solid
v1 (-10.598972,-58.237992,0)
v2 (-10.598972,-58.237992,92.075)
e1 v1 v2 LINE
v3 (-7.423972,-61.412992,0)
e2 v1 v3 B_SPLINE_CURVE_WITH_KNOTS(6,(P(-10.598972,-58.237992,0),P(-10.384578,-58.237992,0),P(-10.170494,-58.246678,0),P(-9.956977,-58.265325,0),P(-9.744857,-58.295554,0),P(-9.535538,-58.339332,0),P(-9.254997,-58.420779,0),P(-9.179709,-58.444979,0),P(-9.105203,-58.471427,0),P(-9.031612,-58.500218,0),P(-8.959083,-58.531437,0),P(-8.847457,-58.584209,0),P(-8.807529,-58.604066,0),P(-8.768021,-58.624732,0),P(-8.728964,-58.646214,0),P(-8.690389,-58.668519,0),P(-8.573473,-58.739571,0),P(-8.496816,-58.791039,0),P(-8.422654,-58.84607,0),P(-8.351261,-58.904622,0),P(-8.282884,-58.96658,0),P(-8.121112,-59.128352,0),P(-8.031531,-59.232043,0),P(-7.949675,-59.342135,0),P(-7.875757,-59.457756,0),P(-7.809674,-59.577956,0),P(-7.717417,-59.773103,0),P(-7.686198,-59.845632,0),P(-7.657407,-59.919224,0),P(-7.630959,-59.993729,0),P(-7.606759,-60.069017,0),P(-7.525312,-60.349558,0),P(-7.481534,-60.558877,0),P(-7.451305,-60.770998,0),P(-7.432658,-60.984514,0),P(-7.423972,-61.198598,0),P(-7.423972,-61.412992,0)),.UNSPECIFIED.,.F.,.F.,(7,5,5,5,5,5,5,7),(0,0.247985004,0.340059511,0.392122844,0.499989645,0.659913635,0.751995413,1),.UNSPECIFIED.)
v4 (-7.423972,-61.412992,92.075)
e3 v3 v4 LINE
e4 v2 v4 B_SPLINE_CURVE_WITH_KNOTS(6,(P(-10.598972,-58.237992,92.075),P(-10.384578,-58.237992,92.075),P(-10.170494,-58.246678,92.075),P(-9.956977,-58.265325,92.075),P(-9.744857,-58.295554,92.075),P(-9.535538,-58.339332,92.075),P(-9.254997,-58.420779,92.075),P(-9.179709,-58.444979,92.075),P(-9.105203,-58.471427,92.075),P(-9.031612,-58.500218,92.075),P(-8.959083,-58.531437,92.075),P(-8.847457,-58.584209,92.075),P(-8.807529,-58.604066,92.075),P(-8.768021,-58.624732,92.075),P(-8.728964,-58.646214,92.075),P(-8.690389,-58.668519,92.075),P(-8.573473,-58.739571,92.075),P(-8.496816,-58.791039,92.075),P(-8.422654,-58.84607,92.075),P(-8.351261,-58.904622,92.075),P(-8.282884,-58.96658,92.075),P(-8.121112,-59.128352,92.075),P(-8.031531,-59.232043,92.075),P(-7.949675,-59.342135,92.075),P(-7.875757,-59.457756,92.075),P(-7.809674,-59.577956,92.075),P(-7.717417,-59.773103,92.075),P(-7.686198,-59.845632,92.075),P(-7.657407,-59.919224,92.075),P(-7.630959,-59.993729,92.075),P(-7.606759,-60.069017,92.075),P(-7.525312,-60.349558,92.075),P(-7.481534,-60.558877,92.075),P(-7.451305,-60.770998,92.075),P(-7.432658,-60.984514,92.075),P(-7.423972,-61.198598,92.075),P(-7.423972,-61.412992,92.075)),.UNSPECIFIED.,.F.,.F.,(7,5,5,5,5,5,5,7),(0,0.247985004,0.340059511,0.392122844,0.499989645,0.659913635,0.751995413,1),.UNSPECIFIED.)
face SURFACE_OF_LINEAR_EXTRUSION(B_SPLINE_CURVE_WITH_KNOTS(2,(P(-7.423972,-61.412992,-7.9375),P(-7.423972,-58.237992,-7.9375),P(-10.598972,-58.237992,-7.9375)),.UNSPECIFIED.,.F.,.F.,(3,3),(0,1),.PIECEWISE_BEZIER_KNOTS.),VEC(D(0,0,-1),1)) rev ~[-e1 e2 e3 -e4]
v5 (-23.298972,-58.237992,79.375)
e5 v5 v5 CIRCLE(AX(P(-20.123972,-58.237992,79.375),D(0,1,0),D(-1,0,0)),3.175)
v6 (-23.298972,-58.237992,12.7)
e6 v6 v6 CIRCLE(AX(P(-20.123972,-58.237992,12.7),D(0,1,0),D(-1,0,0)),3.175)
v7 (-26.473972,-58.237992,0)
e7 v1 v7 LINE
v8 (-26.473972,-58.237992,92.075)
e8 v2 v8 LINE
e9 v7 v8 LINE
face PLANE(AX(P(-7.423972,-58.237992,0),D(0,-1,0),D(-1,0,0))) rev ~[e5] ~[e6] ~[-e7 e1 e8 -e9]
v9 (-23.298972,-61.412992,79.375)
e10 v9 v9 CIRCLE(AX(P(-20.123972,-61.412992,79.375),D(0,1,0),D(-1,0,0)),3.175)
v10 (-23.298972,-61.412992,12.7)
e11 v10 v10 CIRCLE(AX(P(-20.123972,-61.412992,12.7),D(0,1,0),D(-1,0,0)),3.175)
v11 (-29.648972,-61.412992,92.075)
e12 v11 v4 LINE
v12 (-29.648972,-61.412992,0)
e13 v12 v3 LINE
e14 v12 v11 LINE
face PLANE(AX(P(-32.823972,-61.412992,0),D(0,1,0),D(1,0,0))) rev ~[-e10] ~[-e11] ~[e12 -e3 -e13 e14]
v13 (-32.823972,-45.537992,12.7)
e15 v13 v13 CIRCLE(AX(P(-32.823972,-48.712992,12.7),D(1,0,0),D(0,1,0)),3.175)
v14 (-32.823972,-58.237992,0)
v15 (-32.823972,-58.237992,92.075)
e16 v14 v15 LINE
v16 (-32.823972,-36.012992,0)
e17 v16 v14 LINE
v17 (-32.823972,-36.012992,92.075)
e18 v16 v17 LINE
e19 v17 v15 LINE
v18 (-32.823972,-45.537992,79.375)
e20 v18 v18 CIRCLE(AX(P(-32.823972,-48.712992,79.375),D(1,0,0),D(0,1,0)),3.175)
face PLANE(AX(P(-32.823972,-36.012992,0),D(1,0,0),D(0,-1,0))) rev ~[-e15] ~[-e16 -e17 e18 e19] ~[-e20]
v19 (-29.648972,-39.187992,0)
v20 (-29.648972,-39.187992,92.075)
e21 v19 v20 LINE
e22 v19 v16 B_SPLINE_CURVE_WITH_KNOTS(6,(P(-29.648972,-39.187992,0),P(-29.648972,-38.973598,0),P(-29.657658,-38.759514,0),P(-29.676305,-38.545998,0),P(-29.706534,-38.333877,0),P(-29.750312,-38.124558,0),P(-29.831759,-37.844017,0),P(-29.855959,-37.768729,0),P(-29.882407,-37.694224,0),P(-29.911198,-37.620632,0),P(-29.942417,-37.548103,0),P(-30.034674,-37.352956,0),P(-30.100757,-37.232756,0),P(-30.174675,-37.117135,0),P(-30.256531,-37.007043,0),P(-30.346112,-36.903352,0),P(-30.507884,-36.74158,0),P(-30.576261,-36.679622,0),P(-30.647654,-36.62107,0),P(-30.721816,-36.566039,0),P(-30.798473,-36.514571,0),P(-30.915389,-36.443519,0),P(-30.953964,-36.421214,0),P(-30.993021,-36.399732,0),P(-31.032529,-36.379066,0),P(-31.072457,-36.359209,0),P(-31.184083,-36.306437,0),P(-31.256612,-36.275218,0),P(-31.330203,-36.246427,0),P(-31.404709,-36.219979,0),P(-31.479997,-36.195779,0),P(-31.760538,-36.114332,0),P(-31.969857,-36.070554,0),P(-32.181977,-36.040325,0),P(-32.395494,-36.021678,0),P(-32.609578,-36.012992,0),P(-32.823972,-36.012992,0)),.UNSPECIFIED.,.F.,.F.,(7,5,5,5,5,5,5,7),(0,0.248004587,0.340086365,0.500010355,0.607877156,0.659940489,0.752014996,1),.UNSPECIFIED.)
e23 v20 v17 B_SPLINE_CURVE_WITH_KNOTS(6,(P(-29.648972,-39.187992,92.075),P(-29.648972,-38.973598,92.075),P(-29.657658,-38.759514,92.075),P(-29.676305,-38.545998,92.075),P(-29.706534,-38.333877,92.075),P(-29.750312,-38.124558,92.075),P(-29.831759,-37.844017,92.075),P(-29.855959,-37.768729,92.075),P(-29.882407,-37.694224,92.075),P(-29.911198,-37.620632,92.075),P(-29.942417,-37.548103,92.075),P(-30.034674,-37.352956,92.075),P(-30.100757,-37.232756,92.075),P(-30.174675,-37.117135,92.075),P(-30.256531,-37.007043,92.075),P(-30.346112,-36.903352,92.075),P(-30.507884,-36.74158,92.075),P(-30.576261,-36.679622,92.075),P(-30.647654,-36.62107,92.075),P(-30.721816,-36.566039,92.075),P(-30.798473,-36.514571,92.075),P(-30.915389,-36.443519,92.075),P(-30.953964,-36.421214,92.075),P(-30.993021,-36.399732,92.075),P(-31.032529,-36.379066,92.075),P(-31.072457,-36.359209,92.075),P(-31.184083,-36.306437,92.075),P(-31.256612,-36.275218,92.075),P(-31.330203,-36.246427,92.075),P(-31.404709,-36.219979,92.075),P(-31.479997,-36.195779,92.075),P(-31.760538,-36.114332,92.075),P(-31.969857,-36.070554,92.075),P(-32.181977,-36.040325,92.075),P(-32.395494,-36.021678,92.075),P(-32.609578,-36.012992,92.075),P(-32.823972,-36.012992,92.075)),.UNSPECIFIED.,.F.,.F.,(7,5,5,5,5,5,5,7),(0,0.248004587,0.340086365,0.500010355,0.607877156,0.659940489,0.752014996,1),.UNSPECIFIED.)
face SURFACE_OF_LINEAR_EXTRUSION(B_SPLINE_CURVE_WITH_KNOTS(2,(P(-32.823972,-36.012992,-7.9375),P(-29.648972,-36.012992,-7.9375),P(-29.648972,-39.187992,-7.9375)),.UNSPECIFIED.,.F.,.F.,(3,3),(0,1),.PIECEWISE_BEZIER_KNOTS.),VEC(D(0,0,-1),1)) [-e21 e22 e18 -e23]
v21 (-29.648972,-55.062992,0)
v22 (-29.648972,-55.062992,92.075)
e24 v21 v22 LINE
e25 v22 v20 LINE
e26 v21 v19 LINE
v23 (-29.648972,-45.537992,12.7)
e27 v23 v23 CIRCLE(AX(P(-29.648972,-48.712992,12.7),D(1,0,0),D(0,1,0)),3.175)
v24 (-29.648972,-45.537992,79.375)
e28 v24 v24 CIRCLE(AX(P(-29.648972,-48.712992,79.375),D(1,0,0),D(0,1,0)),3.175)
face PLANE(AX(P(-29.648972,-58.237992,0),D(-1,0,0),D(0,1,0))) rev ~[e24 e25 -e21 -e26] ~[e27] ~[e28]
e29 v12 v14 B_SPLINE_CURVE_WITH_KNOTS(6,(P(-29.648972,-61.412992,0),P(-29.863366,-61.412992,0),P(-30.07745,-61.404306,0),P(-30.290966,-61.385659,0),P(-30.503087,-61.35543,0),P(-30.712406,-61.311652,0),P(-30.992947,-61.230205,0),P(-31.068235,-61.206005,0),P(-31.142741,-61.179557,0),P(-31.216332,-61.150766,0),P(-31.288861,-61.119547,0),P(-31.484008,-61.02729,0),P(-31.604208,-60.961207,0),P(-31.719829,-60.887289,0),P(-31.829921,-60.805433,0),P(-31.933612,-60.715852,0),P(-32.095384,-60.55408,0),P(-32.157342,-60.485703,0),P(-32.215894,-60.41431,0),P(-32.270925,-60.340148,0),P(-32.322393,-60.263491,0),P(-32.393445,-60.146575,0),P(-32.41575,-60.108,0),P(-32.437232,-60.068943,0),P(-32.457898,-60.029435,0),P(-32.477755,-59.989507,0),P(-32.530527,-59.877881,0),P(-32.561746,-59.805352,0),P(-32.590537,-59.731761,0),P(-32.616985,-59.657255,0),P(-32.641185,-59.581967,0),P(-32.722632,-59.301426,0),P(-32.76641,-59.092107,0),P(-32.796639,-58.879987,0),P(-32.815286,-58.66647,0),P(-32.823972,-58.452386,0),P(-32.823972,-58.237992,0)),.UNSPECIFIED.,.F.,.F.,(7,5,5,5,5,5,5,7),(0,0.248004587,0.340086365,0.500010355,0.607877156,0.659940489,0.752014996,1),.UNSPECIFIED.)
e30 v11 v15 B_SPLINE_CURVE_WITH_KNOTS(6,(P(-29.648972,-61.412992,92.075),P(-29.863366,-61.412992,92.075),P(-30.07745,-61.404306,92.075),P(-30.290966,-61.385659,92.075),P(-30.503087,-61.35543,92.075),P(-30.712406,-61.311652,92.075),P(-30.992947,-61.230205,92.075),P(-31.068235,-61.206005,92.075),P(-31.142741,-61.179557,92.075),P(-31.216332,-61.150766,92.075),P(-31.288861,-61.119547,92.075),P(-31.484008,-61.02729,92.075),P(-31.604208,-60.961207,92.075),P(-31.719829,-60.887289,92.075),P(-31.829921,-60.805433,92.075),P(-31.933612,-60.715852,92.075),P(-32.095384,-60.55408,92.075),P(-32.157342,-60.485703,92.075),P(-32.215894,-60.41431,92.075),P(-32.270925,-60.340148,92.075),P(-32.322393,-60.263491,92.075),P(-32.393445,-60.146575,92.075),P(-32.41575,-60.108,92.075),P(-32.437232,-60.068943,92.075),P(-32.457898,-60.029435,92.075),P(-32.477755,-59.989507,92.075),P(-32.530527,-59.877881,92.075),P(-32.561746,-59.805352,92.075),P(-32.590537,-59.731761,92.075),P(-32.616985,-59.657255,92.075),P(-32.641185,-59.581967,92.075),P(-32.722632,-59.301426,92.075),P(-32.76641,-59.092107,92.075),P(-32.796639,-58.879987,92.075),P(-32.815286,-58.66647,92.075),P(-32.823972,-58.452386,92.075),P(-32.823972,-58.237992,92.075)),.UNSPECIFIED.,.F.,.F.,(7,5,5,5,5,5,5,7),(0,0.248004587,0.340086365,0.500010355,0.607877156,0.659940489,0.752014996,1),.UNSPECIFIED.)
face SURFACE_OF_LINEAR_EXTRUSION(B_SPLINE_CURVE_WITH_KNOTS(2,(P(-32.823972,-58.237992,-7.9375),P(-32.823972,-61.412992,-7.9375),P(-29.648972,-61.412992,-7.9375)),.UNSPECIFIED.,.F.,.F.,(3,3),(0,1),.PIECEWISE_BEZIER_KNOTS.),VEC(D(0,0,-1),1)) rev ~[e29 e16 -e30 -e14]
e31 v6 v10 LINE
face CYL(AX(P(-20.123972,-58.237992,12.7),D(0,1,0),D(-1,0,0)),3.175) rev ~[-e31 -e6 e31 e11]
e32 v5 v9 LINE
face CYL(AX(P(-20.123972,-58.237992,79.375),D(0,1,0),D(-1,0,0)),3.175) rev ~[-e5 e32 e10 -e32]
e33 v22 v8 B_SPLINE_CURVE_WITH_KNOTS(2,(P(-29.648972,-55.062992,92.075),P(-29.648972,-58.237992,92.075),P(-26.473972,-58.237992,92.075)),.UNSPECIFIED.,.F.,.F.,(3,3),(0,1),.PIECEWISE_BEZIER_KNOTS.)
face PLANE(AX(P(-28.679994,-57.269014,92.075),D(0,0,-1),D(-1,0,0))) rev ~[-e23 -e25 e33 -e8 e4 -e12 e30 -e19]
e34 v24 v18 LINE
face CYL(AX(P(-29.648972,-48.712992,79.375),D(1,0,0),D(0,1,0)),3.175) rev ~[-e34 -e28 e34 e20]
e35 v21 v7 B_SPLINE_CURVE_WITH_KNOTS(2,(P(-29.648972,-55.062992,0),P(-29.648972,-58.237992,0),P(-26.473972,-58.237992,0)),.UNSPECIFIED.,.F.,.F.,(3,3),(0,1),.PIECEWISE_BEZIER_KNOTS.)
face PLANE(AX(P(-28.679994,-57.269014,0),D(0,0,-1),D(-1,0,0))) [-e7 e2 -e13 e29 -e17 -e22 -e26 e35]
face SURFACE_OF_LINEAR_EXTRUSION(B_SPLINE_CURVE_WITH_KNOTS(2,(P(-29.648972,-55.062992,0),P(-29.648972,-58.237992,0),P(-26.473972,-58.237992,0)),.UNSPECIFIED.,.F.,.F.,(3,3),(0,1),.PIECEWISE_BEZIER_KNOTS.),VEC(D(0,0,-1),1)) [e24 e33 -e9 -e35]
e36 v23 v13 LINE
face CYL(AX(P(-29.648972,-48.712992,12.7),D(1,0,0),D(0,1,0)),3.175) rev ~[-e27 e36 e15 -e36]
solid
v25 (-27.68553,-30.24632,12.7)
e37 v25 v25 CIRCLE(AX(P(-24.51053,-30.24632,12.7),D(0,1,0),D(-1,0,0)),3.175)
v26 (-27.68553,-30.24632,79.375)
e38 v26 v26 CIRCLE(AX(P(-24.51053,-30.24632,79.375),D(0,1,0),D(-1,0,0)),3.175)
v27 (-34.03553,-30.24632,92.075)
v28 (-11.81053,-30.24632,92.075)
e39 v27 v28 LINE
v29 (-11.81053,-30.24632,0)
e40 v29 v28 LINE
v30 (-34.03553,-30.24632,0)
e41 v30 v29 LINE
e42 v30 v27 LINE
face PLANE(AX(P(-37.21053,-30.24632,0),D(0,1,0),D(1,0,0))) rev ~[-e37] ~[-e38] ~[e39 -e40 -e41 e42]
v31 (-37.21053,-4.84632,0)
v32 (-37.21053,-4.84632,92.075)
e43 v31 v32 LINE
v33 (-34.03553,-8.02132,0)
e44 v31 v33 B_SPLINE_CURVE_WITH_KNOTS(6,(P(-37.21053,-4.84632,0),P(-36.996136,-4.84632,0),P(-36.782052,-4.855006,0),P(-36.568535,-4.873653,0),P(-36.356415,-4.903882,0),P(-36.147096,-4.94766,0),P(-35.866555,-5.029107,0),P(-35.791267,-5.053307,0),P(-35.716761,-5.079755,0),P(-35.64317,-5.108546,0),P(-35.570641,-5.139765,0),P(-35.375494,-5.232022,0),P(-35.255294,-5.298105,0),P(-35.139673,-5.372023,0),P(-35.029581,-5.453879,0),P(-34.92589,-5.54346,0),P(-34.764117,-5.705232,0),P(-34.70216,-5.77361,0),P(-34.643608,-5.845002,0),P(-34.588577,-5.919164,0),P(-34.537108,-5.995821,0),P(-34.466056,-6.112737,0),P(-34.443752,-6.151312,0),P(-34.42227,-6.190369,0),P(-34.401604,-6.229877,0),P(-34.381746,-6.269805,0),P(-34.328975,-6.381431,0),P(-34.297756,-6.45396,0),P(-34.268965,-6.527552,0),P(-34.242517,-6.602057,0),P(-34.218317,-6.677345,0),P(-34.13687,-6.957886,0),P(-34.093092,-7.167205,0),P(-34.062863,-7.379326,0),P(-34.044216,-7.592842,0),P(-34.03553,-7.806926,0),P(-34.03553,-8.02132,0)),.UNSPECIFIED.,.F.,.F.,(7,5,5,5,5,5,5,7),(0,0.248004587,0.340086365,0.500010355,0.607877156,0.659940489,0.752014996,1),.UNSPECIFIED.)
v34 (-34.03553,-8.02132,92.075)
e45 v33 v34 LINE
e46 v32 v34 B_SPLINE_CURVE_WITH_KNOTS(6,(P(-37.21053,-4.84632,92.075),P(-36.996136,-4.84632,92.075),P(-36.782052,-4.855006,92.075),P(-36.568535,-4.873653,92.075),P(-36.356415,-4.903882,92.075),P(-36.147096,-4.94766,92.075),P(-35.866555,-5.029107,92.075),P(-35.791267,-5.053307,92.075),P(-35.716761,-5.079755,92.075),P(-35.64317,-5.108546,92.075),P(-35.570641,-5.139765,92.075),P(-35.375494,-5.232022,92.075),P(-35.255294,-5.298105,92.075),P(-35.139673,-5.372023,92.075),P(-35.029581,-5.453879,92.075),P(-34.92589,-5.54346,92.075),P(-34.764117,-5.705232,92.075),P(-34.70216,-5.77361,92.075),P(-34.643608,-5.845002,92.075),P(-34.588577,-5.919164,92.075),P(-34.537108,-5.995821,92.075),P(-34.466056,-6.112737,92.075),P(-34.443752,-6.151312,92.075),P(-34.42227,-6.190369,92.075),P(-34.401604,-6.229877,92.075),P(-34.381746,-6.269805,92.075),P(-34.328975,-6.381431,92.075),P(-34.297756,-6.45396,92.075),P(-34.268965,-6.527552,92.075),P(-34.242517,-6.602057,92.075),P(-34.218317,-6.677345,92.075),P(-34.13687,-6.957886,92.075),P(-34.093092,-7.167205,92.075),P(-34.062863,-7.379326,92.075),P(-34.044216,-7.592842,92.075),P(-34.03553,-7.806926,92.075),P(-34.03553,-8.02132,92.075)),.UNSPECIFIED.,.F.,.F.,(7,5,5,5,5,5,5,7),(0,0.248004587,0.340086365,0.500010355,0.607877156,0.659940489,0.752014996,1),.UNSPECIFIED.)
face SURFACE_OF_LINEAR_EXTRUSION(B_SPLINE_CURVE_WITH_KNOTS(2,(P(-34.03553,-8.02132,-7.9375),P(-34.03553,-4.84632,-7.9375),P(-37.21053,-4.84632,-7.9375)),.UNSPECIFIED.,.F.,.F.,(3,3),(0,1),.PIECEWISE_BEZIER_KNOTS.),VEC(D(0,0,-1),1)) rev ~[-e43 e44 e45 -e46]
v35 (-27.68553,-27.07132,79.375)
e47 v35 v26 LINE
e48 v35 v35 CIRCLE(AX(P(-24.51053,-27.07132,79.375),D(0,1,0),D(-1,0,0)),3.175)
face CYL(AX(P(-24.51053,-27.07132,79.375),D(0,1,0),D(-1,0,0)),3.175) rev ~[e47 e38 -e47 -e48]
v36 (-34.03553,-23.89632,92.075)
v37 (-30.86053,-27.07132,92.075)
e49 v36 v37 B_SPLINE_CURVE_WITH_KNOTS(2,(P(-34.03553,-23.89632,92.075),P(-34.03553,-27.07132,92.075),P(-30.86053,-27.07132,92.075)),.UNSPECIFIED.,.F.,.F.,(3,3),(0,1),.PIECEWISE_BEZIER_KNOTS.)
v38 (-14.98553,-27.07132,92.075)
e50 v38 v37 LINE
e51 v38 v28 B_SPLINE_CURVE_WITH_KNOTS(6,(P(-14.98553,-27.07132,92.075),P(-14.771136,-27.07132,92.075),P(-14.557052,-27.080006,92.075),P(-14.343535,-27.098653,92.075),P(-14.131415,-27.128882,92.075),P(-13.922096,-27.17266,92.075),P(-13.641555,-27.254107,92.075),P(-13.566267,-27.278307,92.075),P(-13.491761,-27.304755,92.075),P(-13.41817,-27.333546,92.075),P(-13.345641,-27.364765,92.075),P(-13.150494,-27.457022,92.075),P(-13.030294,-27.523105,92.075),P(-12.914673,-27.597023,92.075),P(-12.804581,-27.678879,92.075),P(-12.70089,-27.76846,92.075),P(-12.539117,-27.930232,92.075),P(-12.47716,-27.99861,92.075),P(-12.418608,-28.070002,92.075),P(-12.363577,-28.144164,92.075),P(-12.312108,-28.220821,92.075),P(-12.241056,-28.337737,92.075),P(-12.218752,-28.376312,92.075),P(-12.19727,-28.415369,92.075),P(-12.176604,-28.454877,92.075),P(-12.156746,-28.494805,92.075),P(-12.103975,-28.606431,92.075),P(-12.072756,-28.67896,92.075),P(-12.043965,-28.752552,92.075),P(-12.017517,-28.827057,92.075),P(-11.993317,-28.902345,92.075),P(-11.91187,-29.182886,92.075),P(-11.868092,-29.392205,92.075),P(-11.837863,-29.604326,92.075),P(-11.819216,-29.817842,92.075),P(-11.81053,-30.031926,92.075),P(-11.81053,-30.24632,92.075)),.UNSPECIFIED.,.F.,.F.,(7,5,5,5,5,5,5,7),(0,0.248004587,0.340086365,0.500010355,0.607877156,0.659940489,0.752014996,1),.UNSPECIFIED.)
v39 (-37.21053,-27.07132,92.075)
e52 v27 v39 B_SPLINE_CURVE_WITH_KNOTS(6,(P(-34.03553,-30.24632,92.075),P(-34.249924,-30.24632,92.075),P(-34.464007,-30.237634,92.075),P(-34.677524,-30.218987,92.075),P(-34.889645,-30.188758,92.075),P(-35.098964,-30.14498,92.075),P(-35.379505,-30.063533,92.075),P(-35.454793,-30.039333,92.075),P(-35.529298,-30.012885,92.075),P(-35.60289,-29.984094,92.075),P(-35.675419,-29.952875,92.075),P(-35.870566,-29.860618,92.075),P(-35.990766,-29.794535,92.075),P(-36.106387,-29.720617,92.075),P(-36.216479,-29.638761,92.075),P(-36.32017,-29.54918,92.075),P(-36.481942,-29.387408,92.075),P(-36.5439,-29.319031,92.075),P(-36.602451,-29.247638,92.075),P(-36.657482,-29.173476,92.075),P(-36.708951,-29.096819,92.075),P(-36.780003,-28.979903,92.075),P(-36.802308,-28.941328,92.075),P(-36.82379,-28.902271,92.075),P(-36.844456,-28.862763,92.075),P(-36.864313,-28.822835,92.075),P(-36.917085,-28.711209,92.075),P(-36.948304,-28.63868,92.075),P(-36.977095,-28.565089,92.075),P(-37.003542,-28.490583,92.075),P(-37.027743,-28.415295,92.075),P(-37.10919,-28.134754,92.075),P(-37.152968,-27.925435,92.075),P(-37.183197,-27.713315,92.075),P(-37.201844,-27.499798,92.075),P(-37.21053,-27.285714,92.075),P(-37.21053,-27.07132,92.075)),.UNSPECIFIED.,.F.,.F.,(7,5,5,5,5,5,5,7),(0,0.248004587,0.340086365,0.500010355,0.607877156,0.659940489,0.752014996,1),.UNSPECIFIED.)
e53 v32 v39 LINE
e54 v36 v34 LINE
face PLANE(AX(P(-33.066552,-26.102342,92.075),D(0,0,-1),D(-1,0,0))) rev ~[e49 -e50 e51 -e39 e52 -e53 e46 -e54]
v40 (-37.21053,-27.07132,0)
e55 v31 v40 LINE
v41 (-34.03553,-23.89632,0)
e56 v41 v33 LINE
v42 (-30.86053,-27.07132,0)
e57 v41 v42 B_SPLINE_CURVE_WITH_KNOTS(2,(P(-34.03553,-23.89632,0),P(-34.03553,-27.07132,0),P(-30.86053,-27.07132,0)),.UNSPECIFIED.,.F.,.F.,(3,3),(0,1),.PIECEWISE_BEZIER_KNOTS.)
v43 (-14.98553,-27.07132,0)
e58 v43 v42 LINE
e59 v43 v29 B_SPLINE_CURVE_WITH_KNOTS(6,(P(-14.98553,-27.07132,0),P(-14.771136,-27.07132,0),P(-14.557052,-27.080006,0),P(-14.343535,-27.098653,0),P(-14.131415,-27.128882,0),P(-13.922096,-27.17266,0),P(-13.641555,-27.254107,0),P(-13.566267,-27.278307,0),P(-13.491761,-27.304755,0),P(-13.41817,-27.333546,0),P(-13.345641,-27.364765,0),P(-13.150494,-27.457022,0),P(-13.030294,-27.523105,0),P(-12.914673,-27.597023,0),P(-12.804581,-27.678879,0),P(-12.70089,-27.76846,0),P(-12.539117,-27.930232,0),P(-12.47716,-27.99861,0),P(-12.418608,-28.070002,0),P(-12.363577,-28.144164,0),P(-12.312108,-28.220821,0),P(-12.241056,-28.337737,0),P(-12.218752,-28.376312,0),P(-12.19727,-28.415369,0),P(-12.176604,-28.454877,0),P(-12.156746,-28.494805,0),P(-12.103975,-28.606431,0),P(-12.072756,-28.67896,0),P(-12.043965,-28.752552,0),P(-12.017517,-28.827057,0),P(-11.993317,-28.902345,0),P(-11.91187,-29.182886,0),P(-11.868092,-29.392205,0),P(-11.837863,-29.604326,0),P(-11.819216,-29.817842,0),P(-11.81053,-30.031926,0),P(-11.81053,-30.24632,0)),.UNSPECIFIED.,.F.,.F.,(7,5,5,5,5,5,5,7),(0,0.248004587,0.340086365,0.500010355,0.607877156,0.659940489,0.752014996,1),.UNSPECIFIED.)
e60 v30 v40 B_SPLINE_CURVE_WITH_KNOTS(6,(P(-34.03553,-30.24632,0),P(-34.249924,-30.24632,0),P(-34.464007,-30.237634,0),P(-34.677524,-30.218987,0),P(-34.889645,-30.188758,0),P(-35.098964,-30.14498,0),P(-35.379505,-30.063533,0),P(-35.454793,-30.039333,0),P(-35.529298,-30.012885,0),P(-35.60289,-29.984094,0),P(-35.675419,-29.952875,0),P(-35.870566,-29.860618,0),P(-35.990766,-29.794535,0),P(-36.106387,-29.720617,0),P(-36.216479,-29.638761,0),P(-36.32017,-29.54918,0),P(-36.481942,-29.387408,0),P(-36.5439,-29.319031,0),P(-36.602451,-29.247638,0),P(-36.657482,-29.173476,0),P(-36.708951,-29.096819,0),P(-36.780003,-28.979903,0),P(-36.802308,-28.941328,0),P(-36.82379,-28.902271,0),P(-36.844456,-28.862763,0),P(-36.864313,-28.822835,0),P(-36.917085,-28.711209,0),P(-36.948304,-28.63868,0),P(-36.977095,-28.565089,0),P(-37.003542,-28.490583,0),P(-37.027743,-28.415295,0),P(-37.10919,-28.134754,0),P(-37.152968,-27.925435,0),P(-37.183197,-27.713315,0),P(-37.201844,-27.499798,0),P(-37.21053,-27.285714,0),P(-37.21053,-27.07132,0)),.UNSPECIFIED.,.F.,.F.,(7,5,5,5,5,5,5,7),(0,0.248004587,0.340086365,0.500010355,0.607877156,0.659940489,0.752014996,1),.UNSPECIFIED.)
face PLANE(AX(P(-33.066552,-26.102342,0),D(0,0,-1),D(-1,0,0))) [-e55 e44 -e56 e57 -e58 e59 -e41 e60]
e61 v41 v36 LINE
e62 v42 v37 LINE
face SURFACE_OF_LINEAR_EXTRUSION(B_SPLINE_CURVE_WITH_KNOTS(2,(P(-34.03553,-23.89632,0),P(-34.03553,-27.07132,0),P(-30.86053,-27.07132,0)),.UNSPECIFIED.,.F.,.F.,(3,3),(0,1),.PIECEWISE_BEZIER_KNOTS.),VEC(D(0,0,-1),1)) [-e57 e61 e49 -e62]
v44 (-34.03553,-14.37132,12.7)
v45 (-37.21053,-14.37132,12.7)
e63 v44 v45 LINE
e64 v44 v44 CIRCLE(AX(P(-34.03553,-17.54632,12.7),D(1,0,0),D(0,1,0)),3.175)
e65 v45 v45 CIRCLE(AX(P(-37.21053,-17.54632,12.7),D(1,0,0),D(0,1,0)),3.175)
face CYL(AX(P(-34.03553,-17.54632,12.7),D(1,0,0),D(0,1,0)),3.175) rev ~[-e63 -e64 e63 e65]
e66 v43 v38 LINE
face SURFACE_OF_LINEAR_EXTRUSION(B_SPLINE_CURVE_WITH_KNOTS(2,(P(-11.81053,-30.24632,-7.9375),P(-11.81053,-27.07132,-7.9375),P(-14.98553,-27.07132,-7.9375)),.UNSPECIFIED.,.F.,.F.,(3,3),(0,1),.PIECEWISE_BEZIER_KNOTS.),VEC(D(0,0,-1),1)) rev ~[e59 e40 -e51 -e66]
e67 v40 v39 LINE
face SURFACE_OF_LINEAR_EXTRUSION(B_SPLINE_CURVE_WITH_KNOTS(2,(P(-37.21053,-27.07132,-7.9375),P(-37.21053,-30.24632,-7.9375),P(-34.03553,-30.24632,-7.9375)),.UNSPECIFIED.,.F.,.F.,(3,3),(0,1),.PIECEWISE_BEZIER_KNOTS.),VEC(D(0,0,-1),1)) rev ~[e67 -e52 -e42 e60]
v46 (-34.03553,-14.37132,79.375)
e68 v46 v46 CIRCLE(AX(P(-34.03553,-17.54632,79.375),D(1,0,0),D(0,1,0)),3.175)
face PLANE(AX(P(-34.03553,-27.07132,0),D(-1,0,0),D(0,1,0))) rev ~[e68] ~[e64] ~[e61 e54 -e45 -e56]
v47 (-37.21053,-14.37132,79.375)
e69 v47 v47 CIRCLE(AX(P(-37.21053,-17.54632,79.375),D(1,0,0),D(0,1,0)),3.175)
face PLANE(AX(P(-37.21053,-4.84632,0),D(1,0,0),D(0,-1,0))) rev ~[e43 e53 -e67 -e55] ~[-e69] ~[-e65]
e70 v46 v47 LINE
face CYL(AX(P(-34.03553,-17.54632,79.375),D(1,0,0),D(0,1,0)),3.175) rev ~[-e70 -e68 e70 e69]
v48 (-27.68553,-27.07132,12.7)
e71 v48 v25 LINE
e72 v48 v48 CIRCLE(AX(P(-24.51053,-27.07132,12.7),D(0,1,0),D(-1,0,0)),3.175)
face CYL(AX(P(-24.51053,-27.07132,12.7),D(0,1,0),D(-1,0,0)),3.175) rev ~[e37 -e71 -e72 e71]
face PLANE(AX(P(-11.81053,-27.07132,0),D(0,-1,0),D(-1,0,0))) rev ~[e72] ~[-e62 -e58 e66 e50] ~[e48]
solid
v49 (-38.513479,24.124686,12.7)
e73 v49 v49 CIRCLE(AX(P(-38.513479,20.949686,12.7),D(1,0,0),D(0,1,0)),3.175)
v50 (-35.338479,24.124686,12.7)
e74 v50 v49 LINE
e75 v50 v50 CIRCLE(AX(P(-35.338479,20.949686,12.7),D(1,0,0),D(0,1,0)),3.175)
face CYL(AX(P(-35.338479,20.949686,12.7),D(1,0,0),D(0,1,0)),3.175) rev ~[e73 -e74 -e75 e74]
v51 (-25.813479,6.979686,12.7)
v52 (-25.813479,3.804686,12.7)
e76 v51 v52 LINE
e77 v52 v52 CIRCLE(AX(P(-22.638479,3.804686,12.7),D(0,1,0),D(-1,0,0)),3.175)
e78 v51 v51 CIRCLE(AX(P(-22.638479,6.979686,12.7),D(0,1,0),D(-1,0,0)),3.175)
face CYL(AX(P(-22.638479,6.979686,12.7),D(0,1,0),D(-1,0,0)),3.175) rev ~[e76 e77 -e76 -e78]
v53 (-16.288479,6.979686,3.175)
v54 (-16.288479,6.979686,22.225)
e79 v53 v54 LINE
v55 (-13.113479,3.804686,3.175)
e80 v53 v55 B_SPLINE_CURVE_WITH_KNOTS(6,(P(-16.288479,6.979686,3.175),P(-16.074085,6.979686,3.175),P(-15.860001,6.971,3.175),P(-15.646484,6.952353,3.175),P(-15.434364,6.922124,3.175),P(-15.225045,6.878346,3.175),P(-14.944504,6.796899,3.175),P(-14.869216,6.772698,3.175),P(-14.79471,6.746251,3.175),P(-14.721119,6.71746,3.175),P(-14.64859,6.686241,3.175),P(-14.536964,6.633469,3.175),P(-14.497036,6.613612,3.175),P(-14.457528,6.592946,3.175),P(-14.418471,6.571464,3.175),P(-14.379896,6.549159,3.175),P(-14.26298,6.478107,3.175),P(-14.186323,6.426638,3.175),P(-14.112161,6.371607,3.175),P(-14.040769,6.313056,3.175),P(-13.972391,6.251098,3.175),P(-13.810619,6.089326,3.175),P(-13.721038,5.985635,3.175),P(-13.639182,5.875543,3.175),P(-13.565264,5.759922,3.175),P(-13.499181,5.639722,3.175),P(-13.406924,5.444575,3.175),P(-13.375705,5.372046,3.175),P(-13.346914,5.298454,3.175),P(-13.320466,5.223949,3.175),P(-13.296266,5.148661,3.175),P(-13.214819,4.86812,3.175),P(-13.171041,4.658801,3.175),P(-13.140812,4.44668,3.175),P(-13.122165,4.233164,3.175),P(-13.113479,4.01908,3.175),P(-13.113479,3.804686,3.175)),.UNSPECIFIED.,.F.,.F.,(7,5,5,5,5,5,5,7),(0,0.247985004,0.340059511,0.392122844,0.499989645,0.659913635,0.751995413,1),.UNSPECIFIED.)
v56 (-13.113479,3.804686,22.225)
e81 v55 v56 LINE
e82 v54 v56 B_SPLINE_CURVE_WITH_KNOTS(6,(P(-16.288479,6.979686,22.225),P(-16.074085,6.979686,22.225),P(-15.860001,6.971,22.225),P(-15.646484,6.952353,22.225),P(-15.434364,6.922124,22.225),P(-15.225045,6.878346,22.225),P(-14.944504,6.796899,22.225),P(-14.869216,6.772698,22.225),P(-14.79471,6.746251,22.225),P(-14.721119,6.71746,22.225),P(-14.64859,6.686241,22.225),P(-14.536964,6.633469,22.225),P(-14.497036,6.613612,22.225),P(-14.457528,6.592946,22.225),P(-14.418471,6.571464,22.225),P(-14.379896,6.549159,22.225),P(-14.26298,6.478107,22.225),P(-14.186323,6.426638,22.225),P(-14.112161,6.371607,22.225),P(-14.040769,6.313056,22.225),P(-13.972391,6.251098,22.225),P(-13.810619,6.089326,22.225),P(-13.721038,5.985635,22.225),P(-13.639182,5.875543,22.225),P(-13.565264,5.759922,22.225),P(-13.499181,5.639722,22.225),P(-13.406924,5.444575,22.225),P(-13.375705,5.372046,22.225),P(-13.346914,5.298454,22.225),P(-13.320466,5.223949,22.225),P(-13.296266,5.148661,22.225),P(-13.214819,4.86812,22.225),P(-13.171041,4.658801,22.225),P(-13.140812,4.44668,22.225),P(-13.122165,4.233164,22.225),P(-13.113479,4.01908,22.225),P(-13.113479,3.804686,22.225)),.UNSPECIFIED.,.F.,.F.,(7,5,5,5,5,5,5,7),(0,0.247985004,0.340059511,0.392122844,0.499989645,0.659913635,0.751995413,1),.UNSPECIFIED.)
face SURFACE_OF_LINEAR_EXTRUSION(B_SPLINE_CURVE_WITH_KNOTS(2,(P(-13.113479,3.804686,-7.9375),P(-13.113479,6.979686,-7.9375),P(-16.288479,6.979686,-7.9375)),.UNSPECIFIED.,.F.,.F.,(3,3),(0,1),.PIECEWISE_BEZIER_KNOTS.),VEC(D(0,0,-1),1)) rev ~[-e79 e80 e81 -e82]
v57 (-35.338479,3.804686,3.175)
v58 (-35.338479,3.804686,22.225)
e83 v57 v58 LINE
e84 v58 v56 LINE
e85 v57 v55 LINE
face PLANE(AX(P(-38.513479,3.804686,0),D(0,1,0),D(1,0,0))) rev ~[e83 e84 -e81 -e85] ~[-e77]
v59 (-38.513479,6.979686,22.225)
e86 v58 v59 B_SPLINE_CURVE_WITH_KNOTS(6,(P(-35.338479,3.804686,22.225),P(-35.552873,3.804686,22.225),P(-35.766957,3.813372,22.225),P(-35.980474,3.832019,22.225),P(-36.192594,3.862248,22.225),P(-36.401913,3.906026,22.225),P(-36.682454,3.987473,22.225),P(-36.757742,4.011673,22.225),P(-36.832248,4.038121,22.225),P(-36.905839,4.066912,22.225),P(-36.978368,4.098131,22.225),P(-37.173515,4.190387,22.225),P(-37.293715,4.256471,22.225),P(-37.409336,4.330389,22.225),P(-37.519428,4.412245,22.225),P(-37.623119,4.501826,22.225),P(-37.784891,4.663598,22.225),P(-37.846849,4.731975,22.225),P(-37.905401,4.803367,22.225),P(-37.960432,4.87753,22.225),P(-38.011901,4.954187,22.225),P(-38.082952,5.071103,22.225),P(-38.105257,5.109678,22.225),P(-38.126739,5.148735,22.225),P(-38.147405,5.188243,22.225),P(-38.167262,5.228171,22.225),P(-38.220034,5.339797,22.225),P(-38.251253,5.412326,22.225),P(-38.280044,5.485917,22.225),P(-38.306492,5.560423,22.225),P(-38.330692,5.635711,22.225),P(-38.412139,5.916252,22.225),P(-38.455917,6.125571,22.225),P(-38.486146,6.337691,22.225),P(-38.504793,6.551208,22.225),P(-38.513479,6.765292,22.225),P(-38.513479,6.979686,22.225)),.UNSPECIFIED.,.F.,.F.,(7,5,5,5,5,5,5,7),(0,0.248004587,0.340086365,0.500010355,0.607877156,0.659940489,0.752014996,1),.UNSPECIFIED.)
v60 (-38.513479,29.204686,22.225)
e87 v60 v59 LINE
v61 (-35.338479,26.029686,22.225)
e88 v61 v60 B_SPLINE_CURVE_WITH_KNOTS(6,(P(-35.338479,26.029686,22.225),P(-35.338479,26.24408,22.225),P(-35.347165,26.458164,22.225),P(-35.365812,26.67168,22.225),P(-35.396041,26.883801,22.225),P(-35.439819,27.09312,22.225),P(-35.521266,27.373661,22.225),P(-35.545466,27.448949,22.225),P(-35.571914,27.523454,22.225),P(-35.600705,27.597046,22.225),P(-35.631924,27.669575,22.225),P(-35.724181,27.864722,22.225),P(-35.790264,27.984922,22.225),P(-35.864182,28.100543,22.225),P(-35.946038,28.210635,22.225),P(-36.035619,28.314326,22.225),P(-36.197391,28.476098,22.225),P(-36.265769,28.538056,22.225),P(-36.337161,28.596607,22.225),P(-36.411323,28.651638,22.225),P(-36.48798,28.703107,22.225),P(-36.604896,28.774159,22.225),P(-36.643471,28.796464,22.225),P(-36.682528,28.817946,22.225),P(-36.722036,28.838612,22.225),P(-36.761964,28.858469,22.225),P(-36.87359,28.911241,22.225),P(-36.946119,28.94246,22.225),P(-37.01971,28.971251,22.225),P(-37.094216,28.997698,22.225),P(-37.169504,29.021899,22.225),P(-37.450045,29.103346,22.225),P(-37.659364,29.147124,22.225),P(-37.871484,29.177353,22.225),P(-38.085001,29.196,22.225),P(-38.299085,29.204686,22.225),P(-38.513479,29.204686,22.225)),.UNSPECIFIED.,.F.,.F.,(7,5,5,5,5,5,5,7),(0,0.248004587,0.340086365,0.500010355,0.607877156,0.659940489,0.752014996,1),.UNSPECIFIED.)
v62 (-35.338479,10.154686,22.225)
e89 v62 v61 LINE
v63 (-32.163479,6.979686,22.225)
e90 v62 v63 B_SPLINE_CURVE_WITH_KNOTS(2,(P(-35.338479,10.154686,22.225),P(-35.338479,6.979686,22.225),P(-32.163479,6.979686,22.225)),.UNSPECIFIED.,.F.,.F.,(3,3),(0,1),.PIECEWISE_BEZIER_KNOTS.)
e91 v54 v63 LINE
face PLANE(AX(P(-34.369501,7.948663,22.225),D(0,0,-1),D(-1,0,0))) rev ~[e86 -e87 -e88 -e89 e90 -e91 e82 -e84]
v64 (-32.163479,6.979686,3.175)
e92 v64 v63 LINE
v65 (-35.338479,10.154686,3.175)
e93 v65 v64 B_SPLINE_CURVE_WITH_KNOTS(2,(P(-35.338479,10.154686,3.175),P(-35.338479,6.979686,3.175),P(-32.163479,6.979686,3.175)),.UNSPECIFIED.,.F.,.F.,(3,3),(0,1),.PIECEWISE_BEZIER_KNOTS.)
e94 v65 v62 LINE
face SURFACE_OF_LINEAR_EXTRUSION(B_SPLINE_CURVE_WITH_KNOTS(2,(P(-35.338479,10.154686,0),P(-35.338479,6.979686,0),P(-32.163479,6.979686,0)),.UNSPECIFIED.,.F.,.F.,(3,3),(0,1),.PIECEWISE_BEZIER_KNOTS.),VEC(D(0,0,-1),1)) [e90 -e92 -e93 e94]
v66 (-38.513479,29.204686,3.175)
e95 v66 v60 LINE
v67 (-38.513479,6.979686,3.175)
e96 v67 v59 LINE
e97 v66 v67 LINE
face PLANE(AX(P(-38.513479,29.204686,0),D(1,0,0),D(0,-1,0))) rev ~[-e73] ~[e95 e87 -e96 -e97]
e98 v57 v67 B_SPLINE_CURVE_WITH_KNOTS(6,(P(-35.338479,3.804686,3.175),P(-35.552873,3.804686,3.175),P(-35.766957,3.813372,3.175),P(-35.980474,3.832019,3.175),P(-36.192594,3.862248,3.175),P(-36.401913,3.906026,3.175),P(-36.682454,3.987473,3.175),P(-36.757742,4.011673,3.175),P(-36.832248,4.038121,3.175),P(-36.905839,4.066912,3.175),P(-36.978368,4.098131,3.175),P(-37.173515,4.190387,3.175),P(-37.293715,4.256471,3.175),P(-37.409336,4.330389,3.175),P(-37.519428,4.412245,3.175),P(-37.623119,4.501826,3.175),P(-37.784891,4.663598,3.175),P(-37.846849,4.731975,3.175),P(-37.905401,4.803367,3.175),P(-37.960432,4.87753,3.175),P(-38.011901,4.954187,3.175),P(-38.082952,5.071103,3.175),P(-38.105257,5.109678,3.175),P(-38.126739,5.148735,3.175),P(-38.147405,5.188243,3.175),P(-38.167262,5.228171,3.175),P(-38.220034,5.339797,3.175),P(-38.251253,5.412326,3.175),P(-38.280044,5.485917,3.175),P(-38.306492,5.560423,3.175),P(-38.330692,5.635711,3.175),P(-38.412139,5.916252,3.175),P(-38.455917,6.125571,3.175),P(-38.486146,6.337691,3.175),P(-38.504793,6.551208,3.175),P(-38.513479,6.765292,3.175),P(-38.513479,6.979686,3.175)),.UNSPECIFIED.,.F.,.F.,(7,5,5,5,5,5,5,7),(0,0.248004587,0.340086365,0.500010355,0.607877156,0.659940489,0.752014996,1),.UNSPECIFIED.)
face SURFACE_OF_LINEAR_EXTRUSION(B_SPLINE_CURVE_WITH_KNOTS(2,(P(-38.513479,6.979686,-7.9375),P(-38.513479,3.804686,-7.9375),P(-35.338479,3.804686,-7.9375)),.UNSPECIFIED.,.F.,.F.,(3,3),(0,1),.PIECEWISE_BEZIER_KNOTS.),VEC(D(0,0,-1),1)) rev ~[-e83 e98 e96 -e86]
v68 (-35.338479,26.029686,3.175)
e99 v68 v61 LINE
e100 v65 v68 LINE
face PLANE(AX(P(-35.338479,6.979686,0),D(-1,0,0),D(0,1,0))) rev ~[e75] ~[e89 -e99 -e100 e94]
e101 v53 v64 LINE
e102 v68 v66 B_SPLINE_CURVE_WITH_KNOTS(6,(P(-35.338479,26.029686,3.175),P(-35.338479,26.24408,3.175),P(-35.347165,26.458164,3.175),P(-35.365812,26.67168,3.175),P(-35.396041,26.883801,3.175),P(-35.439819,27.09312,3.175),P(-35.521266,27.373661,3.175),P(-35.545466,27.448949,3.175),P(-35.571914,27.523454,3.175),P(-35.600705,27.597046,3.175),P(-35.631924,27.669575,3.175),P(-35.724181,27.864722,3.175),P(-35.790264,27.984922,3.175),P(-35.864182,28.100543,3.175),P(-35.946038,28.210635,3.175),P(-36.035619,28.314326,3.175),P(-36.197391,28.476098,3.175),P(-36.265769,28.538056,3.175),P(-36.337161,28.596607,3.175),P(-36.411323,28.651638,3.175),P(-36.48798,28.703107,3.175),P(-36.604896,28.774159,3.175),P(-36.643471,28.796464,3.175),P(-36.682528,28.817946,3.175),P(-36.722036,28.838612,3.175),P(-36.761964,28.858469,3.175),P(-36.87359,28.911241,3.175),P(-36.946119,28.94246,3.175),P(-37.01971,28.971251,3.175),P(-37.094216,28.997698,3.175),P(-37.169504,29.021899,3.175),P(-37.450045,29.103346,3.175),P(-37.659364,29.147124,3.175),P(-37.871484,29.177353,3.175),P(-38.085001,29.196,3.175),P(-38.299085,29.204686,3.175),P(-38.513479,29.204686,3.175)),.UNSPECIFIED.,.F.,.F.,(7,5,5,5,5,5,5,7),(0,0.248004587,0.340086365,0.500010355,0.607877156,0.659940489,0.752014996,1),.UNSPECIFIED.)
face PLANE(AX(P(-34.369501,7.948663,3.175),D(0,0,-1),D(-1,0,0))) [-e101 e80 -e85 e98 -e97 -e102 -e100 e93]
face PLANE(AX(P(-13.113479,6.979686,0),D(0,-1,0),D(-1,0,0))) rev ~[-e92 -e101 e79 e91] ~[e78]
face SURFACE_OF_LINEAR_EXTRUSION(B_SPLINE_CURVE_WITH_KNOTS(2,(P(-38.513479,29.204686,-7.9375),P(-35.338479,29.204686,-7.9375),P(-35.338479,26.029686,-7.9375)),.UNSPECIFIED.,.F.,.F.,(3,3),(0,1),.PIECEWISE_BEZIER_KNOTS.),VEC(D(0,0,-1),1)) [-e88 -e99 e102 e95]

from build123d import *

# Parameters (mm, degrees)
F1_DEPTH       = 25.4
F3_DEPTH       = 92.075
F7_R           = 3.175
F9_DEPTH       = 3.175
F8_R           = 3.175
F10_DEPTH      = 3.175
F11_R          = 3.175
F13_DEPTH      = 3.175
F12_R          = 3.175
F14_DEPTH      = 3.175
F6_R           = 3.175
F15_DEPTH      = 3.175
F16_R          = 3.175
F17_DEPTH      = 3.175
F18_T1_DEPTH   = 92.075
F18_T3_DEPTH   = 107.95
F18_2_T1_DEPTH = 25.4
F18_2_T3_DEPTH = 41.275
F18_3_T1_DEPTH = 92.075
F18_3_T3_DEPTH = 107.95
F19_DEPTH      = 1.5875
F20_DEPTH      = 1.5875
F21_DEPTH      = 1.5875
F22_DEPTH      = 1.5875


# Not quite as in the source:
# - a fillet or chamfer that OpenCascade refuses, or shapes differently, is made with other operations: its cross-section is extruded or revolved along the edge and cut away or added


with BuildPart() as f1:
    # F0 (on Top) → F1 (new body)
    with BuildSketch(Plane.XY):
        Polygon((-35.3384790047, 29.2046858582), (-38.5134790047, 29.2046858582), (-38.5134790047, 3.8046858582), (-13.1134790047, 3.8046858582), (-13.1134790047, 6.9796858582), (-35.3384790047, 6.9796858582), align=None)
    extrude(amount=F1_DEPTH)

    # F6 (on face) → F15 (cut)
    with BuildSketch(Plane.YZ.offset(-35.3384790047)):
        with Locations((20.9496858582, 12.7)):
            Circle(F6_R)
    extrude(amount=-F15_DEPTH, mode=Mode.SUBTRACT)

    # F16 (on face) → F17 (cut)
    with BuildSketch(Plane(origin=(0, 6.9796858582, 0), x_dir=(-1, 0, 0), z_dir=(0, 1, 0))):
        with Locations((22.6384790047, 12.7)):
            Circle(F16_R)
    extrude(amount=-F17_DEPTH, mode=Mode.SUBTRACT)

    # F18#2: fillet of radius 3.175 on 4 edges, made by hand

    # F18_2_s2 → F18_2_t1 (join)
    with BuildSketch(Plane.XY):
        with BuildLine():
            add(Edge.make_bspline(
                [(-35.3384790047, 10.1546858582), (-35.3384790047, 6.9796858582), (-32.1634790047, 6.9796858582)],
                knots=[0, 0, 0, 1, 1, 1], degree=2, weights=[1, 1, 1]))
            Line((-32.1634790047, 6.9796858582), (-35.3384790047, 6.9796858582))
            Line((-35.3384790047, 6.9796858582), (-35.3384790047, 10.1546858582))
        make_face()
    extrude(amount=F18_2_T1_DEPTH)

    # F18_2_s4 → F18_2_t3 (cut)
    with BuildSketch(Plane.XY.offset(-7.9375)):
        with BuildLine():
            add(Edge.make_bspline(
                [(-38.5134790047, 6.9796858582), (-38.5134790047, 3.8046858582), (-35.3384790047, 3.8046858582)],
                knots=[0, 0, 0, 1, 1, 1], degree=2, weights=[1, 1, 1]))
            Line((-35.3384790047, 3.8046858582), (-38.5134790047, 3.8046858582))
            Line((-38.5134790047, 3.8046858582), (-38.5134790047, 6.9796858582))
        make_face()
        with BuildLine():
            add(Edge.make_bspline(
                [(-13.1134790047, 3.8046858582), (-13.1134790047, 6.9796858582), (-16.2884790047, 6.9796858582)],
                knots=[0, 0, 0, 1, 1, 1], degree=2, weights=[1, 1, 1]))
            Line((-16.2884790047, 6.9796858582), (-13.1134790047, 6.9796858582))
            Line((-13.1134790047, 6.9796858582), (-13.1134790047, 3.8046858582))
        make_face()
        with BuildLine():
            add(Edge.make_bspline(
                [(-38.5134790047, 29.2046858582), (-35.3384790047, 29.2046858582), (-35.3384790047, 26.0296858582)],
                knots=[0, 0, 0, 1, 1, 1], degree=2, weights=[1, 1, 1]))
            Line((-35.3384790047, 26.0296858582), (-35.3384790047, 29.2046858582))
            Line((-35.3384790047, 29.2046858582), (-38.5134790047, 29.2046858582))
        make_face()
    extrude(amount=F18_2_T3_DEPTH, mode=Mode.SUBTRACT)

    # F19 (cut): a face of the model
    f19_faces = [f1.faces().sort_by_distance(p)[0] for p in [
        (-36.3862356489, 28.1569424984, 0),
    ]]
    extrude(f19_faces, amount=-F19_DEPTH, mode=Mode.SUBTRACT)

    # F20 (cut): a face of the model
    f20_faces = [f1.faces().sort_by_distance(p)[0] for p in [
        (-36.3862356489, 28.1569424984, 25.4),
    ]]
    extrude(f20_faces, amount=-F20_DEPTH, mode=Mode.SUBTRACT)

    # F21 (cut): a face of the model
    f21_faces = [f1.faces().sort_by_distance(p)[0] for p in [
        (-36.3862356489, 28.1569424984, 1.5875),
    ]]
    extrude(f21_faces, amount=-F21_DEPTH, mode=Mode.SUBTRACT)

    # F22 (cut): a face of the model
    f22_faces = [f1.faces().sort_by_distance(p)[0] for p in [
        (-36.3862356489, 28.1569424984, 23.8125),
    ]]
    extrude(f22_faces, amount=-F22_DEPTH, mode=Mode.SUBTRACT)


with BuildPart() as f3:
    # F0 (on Top) → F3 (new body)
    with BuildSketch(Plane.XY):
        Polygon((4.3401528042, 29.2046858582), (4.3401528042, 3.8046858582), (29.7401528042, 3.8046858582), (29.7401528042, 6.9796858582), (7.5151528042, 6.9796858582), (7.5151528042, 29.2046858582), align=None)
    extrude(amount=F3_DEPTH)


with BuildPart() as f3b:
    # F2 (on Top) → F3, piece 2 (new body)
    with BuildSketch(Plane.XY):
        Polygon((-37.2105298044, -4.8463200888), (-37.2105298044, -30.2463200888), (-11.8105298044, -30.2463200888), (-11.8105298044, -27.0713200888), (-34.0355298044, -27.0713200888), (-34.0355298044, -4.8463200888), align=None)
    extrude(amount=F3_DEPTH)

    # F8 (on face) → F10 (cut)
    with BuildSketch(Plane(origin=(0, -27.0713200888, 0), x_dir=(-1, 0, 0), z_dir=(0, 1, 0))):
        with Locations((24.5105298044, 79.375)):
            Circle(F8_R)
        with Locations((24.5105298044, 12.7)):
            Circle(F8_R)
    extrude(amount=-F10_DEPTH, mode=Mode.SUBTRACT)

    # F12 (on face) → F14 (cut)
    with BuildSketch(Plane.YZ.offset(-34.0355298044)):
        with Locations((-17.5463200888, 79.375)):
            Circle(F12_R)
        with Locations((-17.5463200888, 12.7)):
            Circle(F12_R)
    extrude(amount=-F14_DEPTH, mode=Mode.SUBTRACT)

    # F18: fillet of radius 3.175 on 4 edges, made by hand

    # F18_s2 → F18_t1 (join)
    with BuildSketch(Plane.XY):
        with BuildLine():
            add(Edge.make_bspline(
                [(-34.0355298044, -23.8963200888), (-34.0355298044, -27.0713200888), (-30.8605298044, -27.0713200888)],
                knots=[0, 0, 0, 1, 1, 1], degree=2, weights=[1, 1, 1]))
            Line((-30.8605298044, -27.0713200888), (-34.0355298044, -27.0713200888))
            Line((-34.0355298044, -27.0713200888), (-34.0355298044, -23.8963200888))
        make_face()
    extrude(amount=F18_T1_DEPTH)

    # F18_s4 → F18_t3 (cut)
    with BuildSketch(Plane.XY.offset(-7.9375)):
        with BuildLine():
            add(Edge.make_bspline(
                [(-37.2105298044, -27.0713200888), (-37.2105298044, -30.2463200888), (-34.0355298044, -30.2463200888)],
                knots=[0, 0, 0, 1, 1, 1], degree=2, weights=[1, 1, 1]))
            Line((-34.0355298044, -30.2463200888), (-37.2105298044, -30.2463200888))
            Line((-37.2105298044, -30.2463200888), (-37.2105298044, -27.0713200888))
        make_face()
        with BuildLine():
            add(Edge.make_bspline(
                [(-11.8105298044, -30.2463200888), (-11.8105298044, -27.0713200888), (-14.9855298044, -27.0713200888)],
                knots=[0, 0, 0, 1, 1, 1], degree=2, weights=[1, 1, 1]))
            Line((-14.9855298044, -27.0713200888), (-11.8105298044, -27.0713200888))
            Line((-11.8105298044, -27.0713200888), (-11.8105298044, -30.2463200888))
        make_face()
        with BuildLine():
            add(Edge.make_bspline(
                [(-34.0355298044, -8.0213200888), (-34.0355298044, -4.8463200888), (-37.2105298044, -4.8463200888)],
                knots=[0, 0, 0, 1, 1, 1], degree=2, weights=[1, 1, 1]))
            Line((-37.2105298044, -4.8463200888), (-34.0355298044, -4.8463200888))
            Line((-34.0355298044, -4.8463200888), (-34.0355298044, -8.0213200888))
        make_face()
    extrude(amount=F18_T3_DEPTH, mode=Mode.SUBTRACT)


with BuildPart() as f3c:
    # F2 (on Top) → F3, piece 3 (new body)
    with BuildSketch(Plane.XY):
        Polygon((-7.4239719417, -4.8463200888), (-7.4239719417, -30.2463200888), (17.9760280583, -30.2463200888), (17.9760280583, -27.0713200888), (-4.2489719417, -27.0713200888), (-4.2489719417, -4.8463200888), align=None)
    extrude(amount=F3_DEPTH)


with BuildPart() as f3d:
    # F2 (on Top) → F3, piece 4 (new body)
    with BuildSketch(Plane.XY):
        Polygon((-32.8239719417, -36.0129921032), (-32.8239719417, -61.4129921032), (-7.4239719417, -61.4129921032), (-7.4239719417, -58.2379921032), (-29.6489719417, -58.2379921032), (-29.6489719417, -36.0129921032), align=None)
    extrude(amount=F3_DEPTH)

    # F7 (on face) → F9 (cut)
    with BuildSketch(Plane(origin=(0, -58.2379921032, 0), x_dir=(-1, 0, 0), z_dir=(0, 1, 0))):
        with Locations((20.1239719417, 79.375)):
            Circle(F7_R)
        with Locations((20.1239719417, 12.7)):
            Circle(F7_R)
    extrude(amount=-F9_DEPTH, mode=Mode.SUBTRACT)

    # F11 (on face) → F13 (cut)
    with BuildSketch(Plane.YZ.offset(-29.6489719417)):
        with Locations((-48.7129921032, 79.375)):
            Circle(F11_R)
        with Locations((-48.7129921032, 12.7)):
            Circle(F11_R)
    extrude(amount=-F13_DEPTH, mode=Mode.SUBTRACT)

    # F18#3: fillet of radius 3.175 on 4 edges, made by hand

    # F18_3_s2 → F18_3_t1 (join)
    with BuildSketch(Plane.XY):
        with BuildLine():
            add(Edge.make_bspline(
                [(-29.6489719417, -55.0629921032), (-29.6489719417, -58.2379921032), (-26.4739719417, -58.2379921032)],
                knots=[0, 0, 0, 1, 1, 1], degree=2, weights=[1, 1, 1]))
            Line((-26.4739719417, -58.2379921032), (-29.6489719417, -58.2379921032))
            Line((-29.6489719417, -58.2379921032), (-29.6489719417, -55.0629921032))
        make_face()
    extrude(amount=F18_3_T1_DEPTH)

    # F18_3_s4 → F18_3_t3 (cut)
    with BuildSketch(Plane.XY.offset(-7.9375)):
        with BuildLine():
            add(Edge.make_bspline(
                [(-32.8239719417, -58.2379921032), (-32.8239719417, -61.4129921032), (-29.6489719417, -61.4129921032)],
                knots=[0, 0, 0, 1, 1, 1], degree=2, weights=[1, 1, 1]))
            Line((-29.6489719417, -61.4129921032), (-32.8239719417, -61.4129921032))
            Line((-32.8239719417, -61.4129921032), (-32.8239719417, -58.2379921032))
        make_face()
        with BuildLine():
            add(Edge.make_bspline(
                [(-7.4239719417, -61.4129921032), (-7.4239719417, -58.2379921032), (-10.5989719417, -58.2379921032)],
                knots=[0, 0, 0, 1, 1, 1], degree=2, weights=[1, 1, 1]))
            Line((-10.5989719417, -58.2379921032), (-7.4239719417, -58.2379921032))
            Line((-7.4239719417, -58.2379921032), (-7.4239719417, -61.4129921032))
        make_face()
        with BuildLine():
            add(Edge.make_bspline(
                [(-32.8239719417, -36.0129921032), (-29.6489719417, -36.0129921032), (-29.6489719417, -39.1879921032)],
                knots=[0, 0, 0, 1, 1, 1], degree=2, weights=[1, 1, 1]))
            Line((-29.6489719417, -39.1879921032), (-29.6489719417, -36.0129921032))
            Line((-29.6489719417, -36.0129921032), (-32.8239719417, -36.0129921032))
        make_face()
    extrude(amount=F18_3_T3_DEPTH, mode=Mode.SUBTRACT)


solid = Compound([f1.part, f3b.part, f3d.part])
